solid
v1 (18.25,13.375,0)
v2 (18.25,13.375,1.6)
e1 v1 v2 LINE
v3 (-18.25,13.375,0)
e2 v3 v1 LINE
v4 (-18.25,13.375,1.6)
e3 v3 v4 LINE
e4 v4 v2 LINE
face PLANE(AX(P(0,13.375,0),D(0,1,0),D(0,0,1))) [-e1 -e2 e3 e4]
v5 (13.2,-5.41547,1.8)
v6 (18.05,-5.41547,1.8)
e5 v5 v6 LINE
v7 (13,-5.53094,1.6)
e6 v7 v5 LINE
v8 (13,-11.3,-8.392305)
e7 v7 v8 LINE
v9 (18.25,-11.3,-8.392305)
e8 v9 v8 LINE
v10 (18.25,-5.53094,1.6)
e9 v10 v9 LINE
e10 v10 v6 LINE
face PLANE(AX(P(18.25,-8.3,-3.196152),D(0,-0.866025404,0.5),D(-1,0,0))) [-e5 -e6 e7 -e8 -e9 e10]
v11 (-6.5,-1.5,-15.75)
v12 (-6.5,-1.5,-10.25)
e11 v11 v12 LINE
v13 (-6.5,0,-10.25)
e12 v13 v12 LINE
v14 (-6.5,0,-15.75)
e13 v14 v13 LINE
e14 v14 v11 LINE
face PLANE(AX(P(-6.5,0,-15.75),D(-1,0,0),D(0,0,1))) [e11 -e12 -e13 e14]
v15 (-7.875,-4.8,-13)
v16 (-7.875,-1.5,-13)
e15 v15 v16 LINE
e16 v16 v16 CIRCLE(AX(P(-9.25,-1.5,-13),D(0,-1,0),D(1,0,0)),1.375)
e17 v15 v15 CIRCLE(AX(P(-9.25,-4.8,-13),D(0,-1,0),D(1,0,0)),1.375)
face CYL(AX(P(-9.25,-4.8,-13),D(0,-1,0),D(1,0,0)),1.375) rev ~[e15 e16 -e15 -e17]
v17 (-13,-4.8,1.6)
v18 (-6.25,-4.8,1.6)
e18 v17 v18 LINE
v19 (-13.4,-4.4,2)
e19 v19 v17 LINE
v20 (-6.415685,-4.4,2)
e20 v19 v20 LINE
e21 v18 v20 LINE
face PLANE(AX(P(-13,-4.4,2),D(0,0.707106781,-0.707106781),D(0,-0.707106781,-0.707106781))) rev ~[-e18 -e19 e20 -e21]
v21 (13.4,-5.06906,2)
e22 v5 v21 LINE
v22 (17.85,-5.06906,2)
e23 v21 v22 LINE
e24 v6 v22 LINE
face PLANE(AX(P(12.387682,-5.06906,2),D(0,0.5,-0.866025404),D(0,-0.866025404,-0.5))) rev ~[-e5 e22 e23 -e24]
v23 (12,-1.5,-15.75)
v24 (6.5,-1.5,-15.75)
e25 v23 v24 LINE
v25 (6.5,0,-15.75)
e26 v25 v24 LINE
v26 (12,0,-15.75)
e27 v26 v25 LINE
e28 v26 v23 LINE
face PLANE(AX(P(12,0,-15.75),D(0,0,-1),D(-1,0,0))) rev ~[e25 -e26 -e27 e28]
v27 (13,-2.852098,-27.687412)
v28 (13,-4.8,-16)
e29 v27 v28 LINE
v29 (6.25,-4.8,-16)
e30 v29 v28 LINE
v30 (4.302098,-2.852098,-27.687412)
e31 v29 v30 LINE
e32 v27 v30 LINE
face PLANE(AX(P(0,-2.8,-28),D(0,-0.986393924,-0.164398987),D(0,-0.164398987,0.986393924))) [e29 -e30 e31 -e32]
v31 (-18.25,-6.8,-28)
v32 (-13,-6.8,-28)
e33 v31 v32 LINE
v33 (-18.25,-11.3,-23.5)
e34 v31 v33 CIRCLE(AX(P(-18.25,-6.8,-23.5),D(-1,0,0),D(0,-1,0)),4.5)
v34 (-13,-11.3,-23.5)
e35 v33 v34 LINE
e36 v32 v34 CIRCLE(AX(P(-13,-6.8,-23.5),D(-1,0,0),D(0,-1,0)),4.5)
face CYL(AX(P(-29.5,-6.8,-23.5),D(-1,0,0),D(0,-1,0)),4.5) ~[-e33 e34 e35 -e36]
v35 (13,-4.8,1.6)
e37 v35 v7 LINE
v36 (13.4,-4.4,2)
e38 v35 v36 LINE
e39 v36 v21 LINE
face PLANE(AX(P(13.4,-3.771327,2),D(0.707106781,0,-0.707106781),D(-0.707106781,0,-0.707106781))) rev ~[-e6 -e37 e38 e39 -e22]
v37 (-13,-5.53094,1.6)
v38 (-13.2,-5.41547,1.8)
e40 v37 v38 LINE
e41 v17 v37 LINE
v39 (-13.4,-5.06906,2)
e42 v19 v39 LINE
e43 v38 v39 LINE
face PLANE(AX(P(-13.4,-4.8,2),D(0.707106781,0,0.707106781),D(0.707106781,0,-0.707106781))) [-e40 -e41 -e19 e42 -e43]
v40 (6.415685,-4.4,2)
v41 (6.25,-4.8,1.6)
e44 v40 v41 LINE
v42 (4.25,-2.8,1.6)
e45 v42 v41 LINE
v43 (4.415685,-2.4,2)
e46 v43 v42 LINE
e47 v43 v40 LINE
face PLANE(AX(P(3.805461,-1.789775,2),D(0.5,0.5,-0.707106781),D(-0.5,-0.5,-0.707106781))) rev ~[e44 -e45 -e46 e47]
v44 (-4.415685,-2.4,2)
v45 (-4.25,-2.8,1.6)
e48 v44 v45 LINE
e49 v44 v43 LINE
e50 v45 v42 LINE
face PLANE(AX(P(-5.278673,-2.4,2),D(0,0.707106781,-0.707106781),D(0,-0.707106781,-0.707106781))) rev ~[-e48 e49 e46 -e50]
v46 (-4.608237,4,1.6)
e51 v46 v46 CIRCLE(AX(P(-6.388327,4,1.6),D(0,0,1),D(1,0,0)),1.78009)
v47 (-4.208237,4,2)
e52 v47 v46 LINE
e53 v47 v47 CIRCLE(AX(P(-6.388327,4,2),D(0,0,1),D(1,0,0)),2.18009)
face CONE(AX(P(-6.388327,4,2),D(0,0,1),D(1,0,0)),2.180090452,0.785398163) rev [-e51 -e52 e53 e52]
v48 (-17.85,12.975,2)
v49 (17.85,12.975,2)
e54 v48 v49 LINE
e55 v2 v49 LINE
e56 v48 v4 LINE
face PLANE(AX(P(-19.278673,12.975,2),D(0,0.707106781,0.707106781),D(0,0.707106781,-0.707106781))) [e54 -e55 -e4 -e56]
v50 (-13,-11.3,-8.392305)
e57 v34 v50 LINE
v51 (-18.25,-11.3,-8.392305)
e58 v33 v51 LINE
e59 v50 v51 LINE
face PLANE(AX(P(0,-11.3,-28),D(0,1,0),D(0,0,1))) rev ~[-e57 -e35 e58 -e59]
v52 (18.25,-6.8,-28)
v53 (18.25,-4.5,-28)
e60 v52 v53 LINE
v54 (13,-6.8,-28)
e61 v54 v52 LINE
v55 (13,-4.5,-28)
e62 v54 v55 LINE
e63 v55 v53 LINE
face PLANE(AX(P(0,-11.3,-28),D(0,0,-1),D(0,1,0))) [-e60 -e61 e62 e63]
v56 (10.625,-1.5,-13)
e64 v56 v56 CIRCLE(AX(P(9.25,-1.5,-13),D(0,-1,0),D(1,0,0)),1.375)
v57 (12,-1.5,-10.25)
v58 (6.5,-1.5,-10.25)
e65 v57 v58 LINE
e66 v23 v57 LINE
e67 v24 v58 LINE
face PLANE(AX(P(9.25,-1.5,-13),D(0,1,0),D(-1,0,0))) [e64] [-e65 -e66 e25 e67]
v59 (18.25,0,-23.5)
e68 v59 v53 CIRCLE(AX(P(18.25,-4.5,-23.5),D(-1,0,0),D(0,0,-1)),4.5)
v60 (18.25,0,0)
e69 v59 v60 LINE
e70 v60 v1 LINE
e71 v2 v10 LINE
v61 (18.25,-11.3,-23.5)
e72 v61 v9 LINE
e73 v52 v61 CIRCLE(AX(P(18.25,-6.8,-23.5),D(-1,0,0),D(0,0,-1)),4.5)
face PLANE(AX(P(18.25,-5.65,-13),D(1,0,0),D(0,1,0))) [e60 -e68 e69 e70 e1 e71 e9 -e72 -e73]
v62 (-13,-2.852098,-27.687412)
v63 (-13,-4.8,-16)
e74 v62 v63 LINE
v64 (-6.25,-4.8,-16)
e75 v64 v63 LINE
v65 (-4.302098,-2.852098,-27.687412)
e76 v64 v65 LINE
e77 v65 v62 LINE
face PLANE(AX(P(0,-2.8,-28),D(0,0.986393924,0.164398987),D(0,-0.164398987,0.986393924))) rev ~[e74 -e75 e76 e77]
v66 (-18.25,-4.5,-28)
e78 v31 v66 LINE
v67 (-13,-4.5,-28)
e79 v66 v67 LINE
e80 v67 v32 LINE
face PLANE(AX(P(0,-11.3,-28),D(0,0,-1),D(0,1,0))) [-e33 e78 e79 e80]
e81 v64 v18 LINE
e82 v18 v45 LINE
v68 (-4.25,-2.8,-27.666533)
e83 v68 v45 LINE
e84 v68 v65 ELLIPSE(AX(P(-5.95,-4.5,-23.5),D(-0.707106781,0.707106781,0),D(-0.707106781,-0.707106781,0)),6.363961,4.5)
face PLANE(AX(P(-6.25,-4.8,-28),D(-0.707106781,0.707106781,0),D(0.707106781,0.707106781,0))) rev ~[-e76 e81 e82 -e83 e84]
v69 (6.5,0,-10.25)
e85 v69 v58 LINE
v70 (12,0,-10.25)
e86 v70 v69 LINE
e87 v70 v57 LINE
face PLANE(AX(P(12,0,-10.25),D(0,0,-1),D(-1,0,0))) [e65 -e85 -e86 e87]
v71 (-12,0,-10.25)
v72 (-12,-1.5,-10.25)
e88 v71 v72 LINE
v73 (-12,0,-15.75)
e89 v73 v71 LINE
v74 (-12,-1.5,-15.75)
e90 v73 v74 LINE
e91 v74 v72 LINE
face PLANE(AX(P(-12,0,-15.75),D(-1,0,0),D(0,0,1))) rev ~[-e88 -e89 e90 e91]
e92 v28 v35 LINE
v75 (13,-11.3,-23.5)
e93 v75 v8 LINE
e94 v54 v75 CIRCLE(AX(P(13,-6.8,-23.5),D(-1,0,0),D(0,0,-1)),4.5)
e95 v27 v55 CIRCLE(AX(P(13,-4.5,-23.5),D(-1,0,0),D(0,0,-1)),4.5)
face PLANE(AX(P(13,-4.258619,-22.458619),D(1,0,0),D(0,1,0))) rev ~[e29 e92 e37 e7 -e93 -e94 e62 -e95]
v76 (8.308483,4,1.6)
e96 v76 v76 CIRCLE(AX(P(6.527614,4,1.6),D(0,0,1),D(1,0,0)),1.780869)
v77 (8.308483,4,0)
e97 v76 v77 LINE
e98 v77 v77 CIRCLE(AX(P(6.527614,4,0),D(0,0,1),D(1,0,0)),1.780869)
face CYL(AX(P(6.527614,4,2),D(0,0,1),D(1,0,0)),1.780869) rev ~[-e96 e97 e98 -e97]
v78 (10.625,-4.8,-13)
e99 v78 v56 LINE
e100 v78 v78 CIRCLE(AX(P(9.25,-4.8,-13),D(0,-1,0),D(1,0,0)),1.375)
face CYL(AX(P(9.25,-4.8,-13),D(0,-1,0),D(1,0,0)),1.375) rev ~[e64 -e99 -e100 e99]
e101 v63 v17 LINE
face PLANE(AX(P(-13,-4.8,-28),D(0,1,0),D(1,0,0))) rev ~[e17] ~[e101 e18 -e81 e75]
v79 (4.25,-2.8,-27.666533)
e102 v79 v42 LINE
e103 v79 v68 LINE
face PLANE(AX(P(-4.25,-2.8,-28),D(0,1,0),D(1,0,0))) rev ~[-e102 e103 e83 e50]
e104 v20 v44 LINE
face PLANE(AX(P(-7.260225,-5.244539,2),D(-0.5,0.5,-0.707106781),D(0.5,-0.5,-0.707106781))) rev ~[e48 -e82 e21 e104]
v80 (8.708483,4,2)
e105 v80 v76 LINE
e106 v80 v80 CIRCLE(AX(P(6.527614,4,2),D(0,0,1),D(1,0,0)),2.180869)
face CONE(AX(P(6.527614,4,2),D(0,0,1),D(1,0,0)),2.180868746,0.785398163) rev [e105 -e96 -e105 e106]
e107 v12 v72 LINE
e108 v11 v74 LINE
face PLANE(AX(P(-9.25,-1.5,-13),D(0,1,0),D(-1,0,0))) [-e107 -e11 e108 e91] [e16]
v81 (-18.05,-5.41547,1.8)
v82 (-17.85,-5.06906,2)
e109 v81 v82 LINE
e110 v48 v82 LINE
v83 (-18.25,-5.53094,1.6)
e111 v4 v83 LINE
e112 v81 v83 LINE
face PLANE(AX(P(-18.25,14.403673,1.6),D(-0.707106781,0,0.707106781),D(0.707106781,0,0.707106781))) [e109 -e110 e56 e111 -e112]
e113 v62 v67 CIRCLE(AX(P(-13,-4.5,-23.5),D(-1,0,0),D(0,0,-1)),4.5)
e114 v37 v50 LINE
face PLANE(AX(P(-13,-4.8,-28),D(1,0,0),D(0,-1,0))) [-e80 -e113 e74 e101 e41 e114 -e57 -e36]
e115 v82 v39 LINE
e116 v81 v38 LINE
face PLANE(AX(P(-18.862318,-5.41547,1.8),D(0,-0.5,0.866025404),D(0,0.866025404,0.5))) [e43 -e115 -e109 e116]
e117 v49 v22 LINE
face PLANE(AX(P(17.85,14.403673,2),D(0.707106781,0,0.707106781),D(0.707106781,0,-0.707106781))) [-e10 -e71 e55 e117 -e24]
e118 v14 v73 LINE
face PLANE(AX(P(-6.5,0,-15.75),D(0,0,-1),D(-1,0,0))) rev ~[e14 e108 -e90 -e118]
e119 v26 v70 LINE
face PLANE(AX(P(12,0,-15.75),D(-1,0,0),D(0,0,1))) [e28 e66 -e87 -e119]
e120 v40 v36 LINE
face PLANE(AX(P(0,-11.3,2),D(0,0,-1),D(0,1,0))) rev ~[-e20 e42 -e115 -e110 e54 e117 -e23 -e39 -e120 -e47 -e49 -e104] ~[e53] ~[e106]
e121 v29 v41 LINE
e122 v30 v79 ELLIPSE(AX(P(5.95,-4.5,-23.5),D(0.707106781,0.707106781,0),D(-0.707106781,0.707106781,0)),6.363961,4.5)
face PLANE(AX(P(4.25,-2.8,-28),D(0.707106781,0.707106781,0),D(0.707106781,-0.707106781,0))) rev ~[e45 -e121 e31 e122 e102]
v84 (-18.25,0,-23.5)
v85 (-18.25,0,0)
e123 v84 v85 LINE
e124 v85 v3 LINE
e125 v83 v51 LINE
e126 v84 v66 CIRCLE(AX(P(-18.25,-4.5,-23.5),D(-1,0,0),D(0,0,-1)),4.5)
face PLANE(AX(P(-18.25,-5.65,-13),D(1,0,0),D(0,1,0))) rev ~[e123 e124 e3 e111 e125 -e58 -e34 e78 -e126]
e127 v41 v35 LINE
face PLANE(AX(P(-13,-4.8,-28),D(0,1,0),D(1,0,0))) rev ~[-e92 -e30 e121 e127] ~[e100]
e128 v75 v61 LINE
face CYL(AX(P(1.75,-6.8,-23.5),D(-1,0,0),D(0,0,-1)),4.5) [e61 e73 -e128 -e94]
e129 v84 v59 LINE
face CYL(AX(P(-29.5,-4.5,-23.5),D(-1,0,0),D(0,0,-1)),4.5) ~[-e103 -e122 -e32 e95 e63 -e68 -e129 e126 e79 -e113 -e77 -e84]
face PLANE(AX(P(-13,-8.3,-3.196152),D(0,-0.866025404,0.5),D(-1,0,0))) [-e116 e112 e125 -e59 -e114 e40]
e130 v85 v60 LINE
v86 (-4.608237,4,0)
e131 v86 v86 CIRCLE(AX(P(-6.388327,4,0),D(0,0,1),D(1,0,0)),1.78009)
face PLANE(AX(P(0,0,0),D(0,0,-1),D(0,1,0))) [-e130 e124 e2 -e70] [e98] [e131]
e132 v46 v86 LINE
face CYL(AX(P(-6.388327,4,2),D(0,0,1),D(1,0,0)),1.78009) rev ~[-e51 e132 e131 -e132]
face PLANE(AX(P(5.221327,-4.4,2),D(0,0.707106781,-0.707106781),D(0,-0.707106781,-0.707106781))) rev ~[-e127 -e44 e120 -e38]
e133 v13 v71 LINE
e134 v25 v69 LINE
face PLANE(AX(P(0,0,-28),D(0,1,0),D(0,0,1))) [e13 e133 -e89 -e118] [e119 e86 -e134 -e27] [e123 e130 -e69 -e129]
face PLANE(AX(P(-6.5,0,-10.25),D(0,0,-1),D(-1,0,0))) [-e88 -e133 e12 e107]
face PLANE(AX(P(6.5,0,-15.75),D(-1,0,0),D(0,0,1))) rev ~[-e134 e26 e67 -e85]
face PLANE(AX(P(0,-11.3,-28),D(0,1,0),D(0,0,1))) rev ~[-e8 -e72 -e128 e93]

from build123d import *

# Parameters (mm, degrees)
F0_W           = 13.375
F0_H           = 2
F1_DEPTH       = 18.25
F2_R           = 1.7808687455
F2_R_2         = 1.7800904517
F3_DEPTH       = 2
F4_W           = 11.3
F4_H           = 30
F5_DEPTH       = 18.25
F6_W           = 26
F6_H           = 6.5
F7_DEPTH       = 30
F9_DEPTH       = 30
F11_DEPTH      = 13
F11_DEPTH_BACK = 13
F12_R          = 1.375
F13_DEPTH      = 4.8
F14_W          = 5.5
F14_H          = 5.5
F15_DEPTH      = 1.5
F16_T1_DEPTH   = 27.75
F16_T3_DEPTH   = 27.75
F16_T5_DEPTH   = 59
F17_SIZE2      = 10.3923048454
F17_SIZE       = 6
F18_T1_DEPTH   = 20.7323463904
F18_T3_DEPTH   = 6.4746360003
F18_T5_DEPTH   = 38.5573463904
F18_T7_DEPTH   = 1.5286731952
F18_T9_DEPTH   = 7.7786731952
F18_T11_DEPTH  = 6.4746360003
F18_T13_DEPTH  = 7.7786731952
F18_T18_DEPTH  = 4.8857735151
F18_T23_DEPTH  = 10.5573463904
F18_T29_DEPTH  = 4.8857735151
F18_T39_DEPTH  = 2.5573463904
F18_T43_DEPTH  = 8.8073463904
F18_T50_DEPTH  = 4.8857735151
F18_T54_DEPTH  = 10.5573463904
F18_T61_DEPTH  = 2.5573463904
F18_T65_DEPTH  = 8.8073463904
F18_T72_DEPTH  = 10.5573463904
F18_T76_DEPTH  = 4.8857735151


# Not quite as in the source:
# - a fillet or chamfer that OpenCascade refuses, or shapes differently, is made with other operations: its cross-section is extruded or revolved along the edge and cut away or added


with BuildPart() as f1:
    # F0 (on Right) → F1 (new body, symmetric)
    with BuildSketch(Plane.YZ):
        with Locations((6.6875, 1)):
            Rectangle(F0_W, F0_H)
    extrude(amount=F1_DEPTH, both=True)

    # F2 (on face) → F3 (cut, through all)
    with BuildSketch(Plane.XY.offset(2)):
        with Locations((6.5276143141, 4)):
            Circle(F2_R)
        with Locations((-6.3883271068, 4)):
            Circle(F2_R_2)
    extrude(amount=-F3_DEPTH, mode=Mode.SUBTRACT)

    # F4 (on Right) → F5 (join, symmetric)
    with BuildSketch(Plane.YZ):
        with Locations((-5.65, -13)):
            Rectangle(F4_W, F4_H)
    extrude(amount=F5_DEPTH, both=True)

    # F6 (on face) → F7 (cut, through all)
    with BuildSketch(Plane(origin=(0, 0, -28), x_dir=(1, 0, 0), z_dir=(0, 0, -1))):
        with Locations((0, 8.05)):
            Rectangle(F6_W, F6_H)
    extrude(amount=-F7_DEPTH, mode=Mode.SUBTRACT)

    # F8 (on face) → F9 (cut, through all)
    with BuildSketch(Plane(origin=(0, 0, -28), x_dir=(1, 0, 0), z_dir=(0, 0, -1))):
        Polygon((6.25, 4.8), (-6.25, 4.8), (-4.25, 2.8), (4.25, 2.8), align=None)
    extrude(amount=-F9_DEPTH, mode=Mode.SUBTRACT)

    # F10 (on Right) → F11 (cut, two sides)
    with BuildSketch(Plane.YZ) as f11_sk:
        Polygon((-4.8, -28), (-2.8, -28), (-4.8, -16), align=None)
    extrude(amount=F11_DEPTH, mode=Mode.SUBTRACT)
    extrude(f11_sk.sketch, amount=-F11_DEPTH_BACK, mode=Mode.SUBTRACT)

    # F12 (on face) → F13 (cut, through all)
    with BuildSketch(Plane.XZ.offset(4.8)):
        with Locations((-9.25, -13)):
            Circle(F12_R)
        with Locations((9.25, -13)):
            Circle(F12_R)
    extrude(amount=-F13_DEPTH, mode=Mode.SUBTRACT)

    # F14 (on face) → F15 (cut)
    with BuildSketch(Plane(origin=(0, 0, 0), x_dir=(-1, 0, 0), z_dir=(0, 1, 0))):
        with Locations((-9.25, -13)):
            Rectangle(F14_W, F14_H)
        with Locations((9.25, -13)):
            Rectangle(F14_W, F14_H)
    extrude(amount=-F15_DEPTH, mode=Mode.SUBTRACT)

    # F16: fillet of radius 4.5 on 3 edges, made by hand

    # F16_s2 → F16_t1 (cut)
    with BuildSketch(Plane.YZ.offset(-29.5)):
        with BuildLine():
            ThreePointArc((-11.3, -23.5), (-9.9819805153, -26.6819805153), (-6.8, -28))
            Line((-6.8, -28), (-11.3, -28))
            Line((-11.3, -28), (-11.3, -23.5))
        make_face()
    extrude(amount=F16_T1_DEPTH, mode=Mode.SUBTRACT)

    # F16_s4 → F16_t3 (cut)
    with BuildSketch(Plane.YZ.offset(1.75)):
        with BuildLine():
            ThreePointArc((-6.8, -28), (-9.9819805153, -26.6819805153), (-11.3, -23.5))
            Line((-11.3, -23.5), (-11.3, -28))
            Line((-11.3, -28), (-6.8, -28))
        make_face()
    extrude(amount=F16_T3_DEPTH, mode=Mode.SUBTRACT)

    # F16_s6 → F16_t5 (cut)
    with BuildSketch(Plane.YZ.offset(-29.5)):
        with BuildLine():
            ThreePointArc((-4.5, -28), (-1.3180194847, -26.6819805153), (0, -23.5))
            Line((0, -23.5), (0, -28))
            Line((0, -28), (-4.5, -28))
        make_face()
    extrude(amount=F16_T5_DEPTH, mode=Mode.SUBTRACT)

    # F17
    f17_edges = [f1.edges().sort_by_distance(p)[0] for p in [
        (-15.625, -11.3, 2),
        (15.625, -11.3, 2),
    ]]
    f17_side = f1.faces().sort_by_distance((-0.00209, 3.324537, 2))[0]
    chamfer(f17_edges, length=F17_SIZE, length2=F17_SIZE2, reference=f17_side)

    # F18: chamfer of 0.4 on 14 edges, made by hand

    # F18_s2 → F18_t1 (cut)
    with BuildSketch(Plane.XZ.offset(-14.4036731952)):
        Polygon((-18.25, 1.6), (-17.85, 2), (-18.25, 2), align=None)
        Polygon((17.85, 2), (18.25, 1.6), (18.25, 2), align=None)
    extrude(amount=F18_T1_DEPTH, mode=Mode.SUBTRACT)

    # F18_s4 → F18_t3 (cut)
    with BuildSketch(Plane.YZ.offset(-18.8623180002)):
        Polygon((-5.4154700538, 1.8), (-5.0690598923, 2), (-5.3, 2), align=None)
    extrude(amount=F18_T3_DEPTH, mode=Mode.SUBTRACT)

    # F18_s6 → F18_t5 (cut)
    with BuildSketch(Plane.YZ.offset(-19.2786731952)):
        Polygon((12.975, 2), (13.375, 1.6), (13.375, 2), align=None)
    extrude(amount=F18_T5_DEPTH, mode=Mode.SUBTRACT)

    # F18_s8 → F18_t7 (cut)
    with BuildSketch(Plane.XZ.offset(4.8)):
        Polygon((-13.4, 2), (-13, 1.6), (-13, 2), align=None)
        Polygon((13.4, 2), (13, 1.6), (13, 2), align=None)
    extrude(amount=F18_T7_DEPTH, mode=Mode.SUBTRACT)

    # F18_s10 → F18_t9 (cut)
    with BuildSketch(Plane.YZ.offset(-13)):
        Polygon((-4.4, 2), (-4.8, 1.6), (-4.8, 2), align=None)
    extrude(amount=F18_T9_DEPTH, mode=Mode.SUBTRACT)

    # F18_s12 → F18_t11 (cut)
    with BuildSketch(Plane.YZ.offset(12.3876819998)):
        Polygon((-5.0690598923, 2), (-5.4154700538, 1.8), (-5.3, 2), align=None)
    extrude(amount=F18_T11_DEPTH, mode=Mode.SUBTRACT)

    # F18_s14 → F18_t13 (cut)
    with BuildSketch(Plane.YZ.offset(5.2213268048)):
        Polygon((-4.4, 2), (-4.8, 1.6), (-4.8, 2), align=None)
    extrude(amount=F18_T13_DEPTH, mode=Mode.SUBTRACT)


with BuildPart() as f18_tool16:
    # F18_s17 → F18_t18 (new body)
    with BuildSketch(Plane(origin=(-6.2523817919, -6.2523817919, 0), x_dir=(0, 0, 1), z_dir=(0.7071067812, 0.7071067812, 0))):
        Polygon((2, -1.4253048327), (1.6, -1.0253048327), (2, -1.0253048327), align=None)
    extrude(amount=F18_T18_DEPTH)

    split(bisect_by=Plane.XZ.offset(2.8), keep=Keep.TOP)


with BuildPart() as f1_1:
    add(f1.part)

    # F18_t15: cut F18_tool16
    add(f18_tool16.part, mode=Mode.SUBTRACT)


with BuildPart() as f18_tool21:
    # F18_s22 → F18_t23 (new body)
    with BuildSketch(Plane.YZ.offset(-5.2786731952)):
        Polygon((-2.4, 2), (-2.8, 1.6), (-2.8, 2), align=None)
    extrude(amount=F18_T23_DEPTH)

    split(bisect_by=Plane(origin=(-0.725, 0.725, 0), x_dir=(0, 0, 1), z_dir=(0.7071067812, -0.7071067812, 0)), keep=Keep.TOP)

    split(bisect_by=Plane(origin=(0.725, 0.725, 0), x_dir=(0, 0, 1), z_dir=(-0.7071067812, -0.7071067812, 0)), keep=Keep.TOP)


with BuildPart() as f1_2:
    add(f1_1.part)

    # F18_t20: cut F18_tool21
    add(f18_tool21.part, mode=Mode.SUBTRACT)


with BuildPart() as f18_tool27:
    # F18_s28 → F18_t29 (new body)
    with BuildSketch(Plane(origin=(2.7976182081, -2.7976182081, 0), x_dir=(0, 0, 1), z_dir=(0.7071067812, -0.7071067812, 0))):
        Polygon((2, -1.4253048327), (1.6, -1.0253048327), (2, -1.0253048327), align=None)
    extrude(amount=F18_T29_DEPTH)

    split(bisect_by=Plane.XZ.offset(2.8), keep=Keep.TOP)


with BuildPart() as f1_3:
    add(f1_2.part)

    # F18_t26: cut F18_tool27
    add(f18_tool27.part, mode=Mode.SUBTRACT)

    # F18_s31 → F18_t32 (revolve, cut)
    with BuildSketch(Plane.XZ.offset(-4)):
        Polygon((-4.2082366551, 2), (-4.6082366551, 1.6), (-4.6082366551, 2), align=None)
    revolve(axis=Axis((-6.3883271068, 4, 2), (0, 0, 1)), mode=Mode.SUBTRACT)

    # F18_s33 → F18_t34 (revolve, cut)
    with BuildSketch(Plane.XZ.offset(-4)):
        Polygon((8.7084830596, 2), (8.3084830596, 1.6), (8.3084830596, 2), align=None)
    revolve(axis=Axis((6.5276143141, 4, 2), (0, 0, 1)), mode=Mode.SUBTRACT)


with BuildPart() as f18_tool37:
    # F18_s38 → F18_t39 (new body)
    with BuildSketch(Plane.XZ.offset(6.3286731952)):
        Polygon((-13.4, 2), (-13, 1.6), (-13, 2), align=None)
    extrude(amount=-F18_T39_DEPTH)

    split(bisect_by=Plane.XZ.offset(4.8), keep=Keep.BOTTOM)


with BuildPart() as f18_tool41:
    # F18_s42 → F18_t43 (new body)
    with BuildSketch(Plane.YZ.offset(-14.0286731952)):
        Polygon((-4.4, 2), (-4.8, 1.6), (-4.8, 2), align=None)
    extrude(amount=F18_T43_DEPTH)

    split(bisect_by=Plane.YZ.offset(-13), keep=Keep.BOTTOM)


with BuildPart() as f18_tool37_1:
    add(f18_tool37.part)

    # F18_t45: intersect F18_tool41
    add(f18_tool41.part, mode=Mode.INTERSECT)


with BuildPart() as f1_4:
    add(f1_3.part)

    # F18_t35: cut F18_tool37
    add(f18_tool37_1.part, mode=Mode.SUBTRACT)


with BuildPart() as f18_tool48:
    # F18_s49 → F18_t50 (new body)
    with BuildSketch(Plane(origin=(-6.2523817919, -6.2523817919, 0), x_dir=(0, 0, 1), z_dir=(0.7071067812, 0.7071067812, 0))):
        Polygon((2, -1.4253048327), (1.6, -1.0253048327), (2, -1.0253048327), align=None)
    extrude(amount=F18_T50_DEPTH)

    split(bisect_by=Plane.XZ.offset(2.8), keep=Keep.BOTTOM)


with BuildPart() as f18_tool52:
    # F18_s53 → F18_t54 (new body)
    with BuildSketch(Plane.YZ.offset(-5.2786731952)):
        Polygon((-2.4, 2), (-2.8, 1.6), (-2.8, 2), align=None)
    extrude(amount=F18_T54_DEPTH)

    split(bisect_by=Plane(origin=(-0.725, 0.725, 0), x_dir=(0, 0, 1), z_dir=(-0.7071067812, 0.7071067812, 0)), keep=Keep.TOP)


with BuildPart() as f18_tool48_1:
    add(f18_tool48.part)

    # F18_t56: intersect F18_tool52
    add(f18_tool52.part, mode=Mode.INTERSECT)


with BuildPart() as f1_5:
    add(f1_4.part)

    # F18_t46: cut F18_tool48
    add(f18_tool48_1.part, mode=Mode.SUBTRACT)


with BuildPart() as f18_tool59:
    # F18_s60 → F18_t61 (new body)
    with BuildSketch(Plane.XZ.offset(3.7713268048)):
        Polygon((13.4, 2), (13, 1.6), (13, 2), align=None)
    extrude(amount=F18_T61_DEPTH)

    split(bisect_by=Plane.XZ.offset(4.8), keep=Keep.BOTTOM)


with BuildPart() as f18_tool63:
    # F18_s64 → F18_t65 (new body)
    with BuildSketch(Plane.YZ.offset(5.2213268048)):
        Polygon((-4.4, 2), (-4.8, 1.6), (-4.8, 2), align=None)
    extrude(amount=F18_T65_DEPTH)

    split(bisect_by=Plane.YZ.offset(13), keep=Keep.TOP)


with BuildPart() as f18_tool59_1:
    add(f18_tool59.part)

    # F18_t67: intersect F18_tool63
    add(f18_tool63.part, mode=Mode.INTERSECT)


with BuildPart() as f1_6:
    add(f1_5.part)

    # F18_t57: cut F18_tool59
    add(f18_tool59_1.part, mode=Mode.SUBTRACT)


with BuildPart() as f18_tool70:
    # F18_s71 → F18_t72 (new body)
    with BuildSketch(Plane.YZ.offset(-5.2786731952)):
        Polygon((-2.4, 2), (-2.8, 1.6), (-2.8, 2), align=None)
    extrude(amount=F18_T72_DEPTH)

    split(bisect_by=Plane(origin=(0.725, 0.725, 0), x_dir=(0, 0, 1), z_dir=(0.7071067812, 0.7071067812, 0)), keep=Keep.TOP)


with BuildPart() as f18_tool74:
    # F18_s75 → F18_t76 (new body)
    with BuildSketch(Plane(origin=(2.7976182081, -2.7976182081, 0), x_dir=(0, 0, 1), z_dir=(0.7071067812, -0.7071067812, 0))):
        Polygon((2, -1.4253048327), (1.6, -1.0253048327), (2, -1.0253048327), align=None)
    extrude(amount=F18_T76_DEPTH)

    split(bisect_by=Plane.XZ.offset(2.8), keep=Keep.BOTTOM)


with BuildPart() as f18_tool70_1:
    add(f18_tool70.part)

    # F18_t78: intersect F18_tool74
    add(f18_tool74.part, mode=Mode.INTERSECT)


with BuildPart() as f1_7:
    add(f1_6.part)

    # F18_t68: cut F18_tool70
    add(f18_tool70_1.part, mode=Mode.SUBTRACT)


solid = f1_7.part
